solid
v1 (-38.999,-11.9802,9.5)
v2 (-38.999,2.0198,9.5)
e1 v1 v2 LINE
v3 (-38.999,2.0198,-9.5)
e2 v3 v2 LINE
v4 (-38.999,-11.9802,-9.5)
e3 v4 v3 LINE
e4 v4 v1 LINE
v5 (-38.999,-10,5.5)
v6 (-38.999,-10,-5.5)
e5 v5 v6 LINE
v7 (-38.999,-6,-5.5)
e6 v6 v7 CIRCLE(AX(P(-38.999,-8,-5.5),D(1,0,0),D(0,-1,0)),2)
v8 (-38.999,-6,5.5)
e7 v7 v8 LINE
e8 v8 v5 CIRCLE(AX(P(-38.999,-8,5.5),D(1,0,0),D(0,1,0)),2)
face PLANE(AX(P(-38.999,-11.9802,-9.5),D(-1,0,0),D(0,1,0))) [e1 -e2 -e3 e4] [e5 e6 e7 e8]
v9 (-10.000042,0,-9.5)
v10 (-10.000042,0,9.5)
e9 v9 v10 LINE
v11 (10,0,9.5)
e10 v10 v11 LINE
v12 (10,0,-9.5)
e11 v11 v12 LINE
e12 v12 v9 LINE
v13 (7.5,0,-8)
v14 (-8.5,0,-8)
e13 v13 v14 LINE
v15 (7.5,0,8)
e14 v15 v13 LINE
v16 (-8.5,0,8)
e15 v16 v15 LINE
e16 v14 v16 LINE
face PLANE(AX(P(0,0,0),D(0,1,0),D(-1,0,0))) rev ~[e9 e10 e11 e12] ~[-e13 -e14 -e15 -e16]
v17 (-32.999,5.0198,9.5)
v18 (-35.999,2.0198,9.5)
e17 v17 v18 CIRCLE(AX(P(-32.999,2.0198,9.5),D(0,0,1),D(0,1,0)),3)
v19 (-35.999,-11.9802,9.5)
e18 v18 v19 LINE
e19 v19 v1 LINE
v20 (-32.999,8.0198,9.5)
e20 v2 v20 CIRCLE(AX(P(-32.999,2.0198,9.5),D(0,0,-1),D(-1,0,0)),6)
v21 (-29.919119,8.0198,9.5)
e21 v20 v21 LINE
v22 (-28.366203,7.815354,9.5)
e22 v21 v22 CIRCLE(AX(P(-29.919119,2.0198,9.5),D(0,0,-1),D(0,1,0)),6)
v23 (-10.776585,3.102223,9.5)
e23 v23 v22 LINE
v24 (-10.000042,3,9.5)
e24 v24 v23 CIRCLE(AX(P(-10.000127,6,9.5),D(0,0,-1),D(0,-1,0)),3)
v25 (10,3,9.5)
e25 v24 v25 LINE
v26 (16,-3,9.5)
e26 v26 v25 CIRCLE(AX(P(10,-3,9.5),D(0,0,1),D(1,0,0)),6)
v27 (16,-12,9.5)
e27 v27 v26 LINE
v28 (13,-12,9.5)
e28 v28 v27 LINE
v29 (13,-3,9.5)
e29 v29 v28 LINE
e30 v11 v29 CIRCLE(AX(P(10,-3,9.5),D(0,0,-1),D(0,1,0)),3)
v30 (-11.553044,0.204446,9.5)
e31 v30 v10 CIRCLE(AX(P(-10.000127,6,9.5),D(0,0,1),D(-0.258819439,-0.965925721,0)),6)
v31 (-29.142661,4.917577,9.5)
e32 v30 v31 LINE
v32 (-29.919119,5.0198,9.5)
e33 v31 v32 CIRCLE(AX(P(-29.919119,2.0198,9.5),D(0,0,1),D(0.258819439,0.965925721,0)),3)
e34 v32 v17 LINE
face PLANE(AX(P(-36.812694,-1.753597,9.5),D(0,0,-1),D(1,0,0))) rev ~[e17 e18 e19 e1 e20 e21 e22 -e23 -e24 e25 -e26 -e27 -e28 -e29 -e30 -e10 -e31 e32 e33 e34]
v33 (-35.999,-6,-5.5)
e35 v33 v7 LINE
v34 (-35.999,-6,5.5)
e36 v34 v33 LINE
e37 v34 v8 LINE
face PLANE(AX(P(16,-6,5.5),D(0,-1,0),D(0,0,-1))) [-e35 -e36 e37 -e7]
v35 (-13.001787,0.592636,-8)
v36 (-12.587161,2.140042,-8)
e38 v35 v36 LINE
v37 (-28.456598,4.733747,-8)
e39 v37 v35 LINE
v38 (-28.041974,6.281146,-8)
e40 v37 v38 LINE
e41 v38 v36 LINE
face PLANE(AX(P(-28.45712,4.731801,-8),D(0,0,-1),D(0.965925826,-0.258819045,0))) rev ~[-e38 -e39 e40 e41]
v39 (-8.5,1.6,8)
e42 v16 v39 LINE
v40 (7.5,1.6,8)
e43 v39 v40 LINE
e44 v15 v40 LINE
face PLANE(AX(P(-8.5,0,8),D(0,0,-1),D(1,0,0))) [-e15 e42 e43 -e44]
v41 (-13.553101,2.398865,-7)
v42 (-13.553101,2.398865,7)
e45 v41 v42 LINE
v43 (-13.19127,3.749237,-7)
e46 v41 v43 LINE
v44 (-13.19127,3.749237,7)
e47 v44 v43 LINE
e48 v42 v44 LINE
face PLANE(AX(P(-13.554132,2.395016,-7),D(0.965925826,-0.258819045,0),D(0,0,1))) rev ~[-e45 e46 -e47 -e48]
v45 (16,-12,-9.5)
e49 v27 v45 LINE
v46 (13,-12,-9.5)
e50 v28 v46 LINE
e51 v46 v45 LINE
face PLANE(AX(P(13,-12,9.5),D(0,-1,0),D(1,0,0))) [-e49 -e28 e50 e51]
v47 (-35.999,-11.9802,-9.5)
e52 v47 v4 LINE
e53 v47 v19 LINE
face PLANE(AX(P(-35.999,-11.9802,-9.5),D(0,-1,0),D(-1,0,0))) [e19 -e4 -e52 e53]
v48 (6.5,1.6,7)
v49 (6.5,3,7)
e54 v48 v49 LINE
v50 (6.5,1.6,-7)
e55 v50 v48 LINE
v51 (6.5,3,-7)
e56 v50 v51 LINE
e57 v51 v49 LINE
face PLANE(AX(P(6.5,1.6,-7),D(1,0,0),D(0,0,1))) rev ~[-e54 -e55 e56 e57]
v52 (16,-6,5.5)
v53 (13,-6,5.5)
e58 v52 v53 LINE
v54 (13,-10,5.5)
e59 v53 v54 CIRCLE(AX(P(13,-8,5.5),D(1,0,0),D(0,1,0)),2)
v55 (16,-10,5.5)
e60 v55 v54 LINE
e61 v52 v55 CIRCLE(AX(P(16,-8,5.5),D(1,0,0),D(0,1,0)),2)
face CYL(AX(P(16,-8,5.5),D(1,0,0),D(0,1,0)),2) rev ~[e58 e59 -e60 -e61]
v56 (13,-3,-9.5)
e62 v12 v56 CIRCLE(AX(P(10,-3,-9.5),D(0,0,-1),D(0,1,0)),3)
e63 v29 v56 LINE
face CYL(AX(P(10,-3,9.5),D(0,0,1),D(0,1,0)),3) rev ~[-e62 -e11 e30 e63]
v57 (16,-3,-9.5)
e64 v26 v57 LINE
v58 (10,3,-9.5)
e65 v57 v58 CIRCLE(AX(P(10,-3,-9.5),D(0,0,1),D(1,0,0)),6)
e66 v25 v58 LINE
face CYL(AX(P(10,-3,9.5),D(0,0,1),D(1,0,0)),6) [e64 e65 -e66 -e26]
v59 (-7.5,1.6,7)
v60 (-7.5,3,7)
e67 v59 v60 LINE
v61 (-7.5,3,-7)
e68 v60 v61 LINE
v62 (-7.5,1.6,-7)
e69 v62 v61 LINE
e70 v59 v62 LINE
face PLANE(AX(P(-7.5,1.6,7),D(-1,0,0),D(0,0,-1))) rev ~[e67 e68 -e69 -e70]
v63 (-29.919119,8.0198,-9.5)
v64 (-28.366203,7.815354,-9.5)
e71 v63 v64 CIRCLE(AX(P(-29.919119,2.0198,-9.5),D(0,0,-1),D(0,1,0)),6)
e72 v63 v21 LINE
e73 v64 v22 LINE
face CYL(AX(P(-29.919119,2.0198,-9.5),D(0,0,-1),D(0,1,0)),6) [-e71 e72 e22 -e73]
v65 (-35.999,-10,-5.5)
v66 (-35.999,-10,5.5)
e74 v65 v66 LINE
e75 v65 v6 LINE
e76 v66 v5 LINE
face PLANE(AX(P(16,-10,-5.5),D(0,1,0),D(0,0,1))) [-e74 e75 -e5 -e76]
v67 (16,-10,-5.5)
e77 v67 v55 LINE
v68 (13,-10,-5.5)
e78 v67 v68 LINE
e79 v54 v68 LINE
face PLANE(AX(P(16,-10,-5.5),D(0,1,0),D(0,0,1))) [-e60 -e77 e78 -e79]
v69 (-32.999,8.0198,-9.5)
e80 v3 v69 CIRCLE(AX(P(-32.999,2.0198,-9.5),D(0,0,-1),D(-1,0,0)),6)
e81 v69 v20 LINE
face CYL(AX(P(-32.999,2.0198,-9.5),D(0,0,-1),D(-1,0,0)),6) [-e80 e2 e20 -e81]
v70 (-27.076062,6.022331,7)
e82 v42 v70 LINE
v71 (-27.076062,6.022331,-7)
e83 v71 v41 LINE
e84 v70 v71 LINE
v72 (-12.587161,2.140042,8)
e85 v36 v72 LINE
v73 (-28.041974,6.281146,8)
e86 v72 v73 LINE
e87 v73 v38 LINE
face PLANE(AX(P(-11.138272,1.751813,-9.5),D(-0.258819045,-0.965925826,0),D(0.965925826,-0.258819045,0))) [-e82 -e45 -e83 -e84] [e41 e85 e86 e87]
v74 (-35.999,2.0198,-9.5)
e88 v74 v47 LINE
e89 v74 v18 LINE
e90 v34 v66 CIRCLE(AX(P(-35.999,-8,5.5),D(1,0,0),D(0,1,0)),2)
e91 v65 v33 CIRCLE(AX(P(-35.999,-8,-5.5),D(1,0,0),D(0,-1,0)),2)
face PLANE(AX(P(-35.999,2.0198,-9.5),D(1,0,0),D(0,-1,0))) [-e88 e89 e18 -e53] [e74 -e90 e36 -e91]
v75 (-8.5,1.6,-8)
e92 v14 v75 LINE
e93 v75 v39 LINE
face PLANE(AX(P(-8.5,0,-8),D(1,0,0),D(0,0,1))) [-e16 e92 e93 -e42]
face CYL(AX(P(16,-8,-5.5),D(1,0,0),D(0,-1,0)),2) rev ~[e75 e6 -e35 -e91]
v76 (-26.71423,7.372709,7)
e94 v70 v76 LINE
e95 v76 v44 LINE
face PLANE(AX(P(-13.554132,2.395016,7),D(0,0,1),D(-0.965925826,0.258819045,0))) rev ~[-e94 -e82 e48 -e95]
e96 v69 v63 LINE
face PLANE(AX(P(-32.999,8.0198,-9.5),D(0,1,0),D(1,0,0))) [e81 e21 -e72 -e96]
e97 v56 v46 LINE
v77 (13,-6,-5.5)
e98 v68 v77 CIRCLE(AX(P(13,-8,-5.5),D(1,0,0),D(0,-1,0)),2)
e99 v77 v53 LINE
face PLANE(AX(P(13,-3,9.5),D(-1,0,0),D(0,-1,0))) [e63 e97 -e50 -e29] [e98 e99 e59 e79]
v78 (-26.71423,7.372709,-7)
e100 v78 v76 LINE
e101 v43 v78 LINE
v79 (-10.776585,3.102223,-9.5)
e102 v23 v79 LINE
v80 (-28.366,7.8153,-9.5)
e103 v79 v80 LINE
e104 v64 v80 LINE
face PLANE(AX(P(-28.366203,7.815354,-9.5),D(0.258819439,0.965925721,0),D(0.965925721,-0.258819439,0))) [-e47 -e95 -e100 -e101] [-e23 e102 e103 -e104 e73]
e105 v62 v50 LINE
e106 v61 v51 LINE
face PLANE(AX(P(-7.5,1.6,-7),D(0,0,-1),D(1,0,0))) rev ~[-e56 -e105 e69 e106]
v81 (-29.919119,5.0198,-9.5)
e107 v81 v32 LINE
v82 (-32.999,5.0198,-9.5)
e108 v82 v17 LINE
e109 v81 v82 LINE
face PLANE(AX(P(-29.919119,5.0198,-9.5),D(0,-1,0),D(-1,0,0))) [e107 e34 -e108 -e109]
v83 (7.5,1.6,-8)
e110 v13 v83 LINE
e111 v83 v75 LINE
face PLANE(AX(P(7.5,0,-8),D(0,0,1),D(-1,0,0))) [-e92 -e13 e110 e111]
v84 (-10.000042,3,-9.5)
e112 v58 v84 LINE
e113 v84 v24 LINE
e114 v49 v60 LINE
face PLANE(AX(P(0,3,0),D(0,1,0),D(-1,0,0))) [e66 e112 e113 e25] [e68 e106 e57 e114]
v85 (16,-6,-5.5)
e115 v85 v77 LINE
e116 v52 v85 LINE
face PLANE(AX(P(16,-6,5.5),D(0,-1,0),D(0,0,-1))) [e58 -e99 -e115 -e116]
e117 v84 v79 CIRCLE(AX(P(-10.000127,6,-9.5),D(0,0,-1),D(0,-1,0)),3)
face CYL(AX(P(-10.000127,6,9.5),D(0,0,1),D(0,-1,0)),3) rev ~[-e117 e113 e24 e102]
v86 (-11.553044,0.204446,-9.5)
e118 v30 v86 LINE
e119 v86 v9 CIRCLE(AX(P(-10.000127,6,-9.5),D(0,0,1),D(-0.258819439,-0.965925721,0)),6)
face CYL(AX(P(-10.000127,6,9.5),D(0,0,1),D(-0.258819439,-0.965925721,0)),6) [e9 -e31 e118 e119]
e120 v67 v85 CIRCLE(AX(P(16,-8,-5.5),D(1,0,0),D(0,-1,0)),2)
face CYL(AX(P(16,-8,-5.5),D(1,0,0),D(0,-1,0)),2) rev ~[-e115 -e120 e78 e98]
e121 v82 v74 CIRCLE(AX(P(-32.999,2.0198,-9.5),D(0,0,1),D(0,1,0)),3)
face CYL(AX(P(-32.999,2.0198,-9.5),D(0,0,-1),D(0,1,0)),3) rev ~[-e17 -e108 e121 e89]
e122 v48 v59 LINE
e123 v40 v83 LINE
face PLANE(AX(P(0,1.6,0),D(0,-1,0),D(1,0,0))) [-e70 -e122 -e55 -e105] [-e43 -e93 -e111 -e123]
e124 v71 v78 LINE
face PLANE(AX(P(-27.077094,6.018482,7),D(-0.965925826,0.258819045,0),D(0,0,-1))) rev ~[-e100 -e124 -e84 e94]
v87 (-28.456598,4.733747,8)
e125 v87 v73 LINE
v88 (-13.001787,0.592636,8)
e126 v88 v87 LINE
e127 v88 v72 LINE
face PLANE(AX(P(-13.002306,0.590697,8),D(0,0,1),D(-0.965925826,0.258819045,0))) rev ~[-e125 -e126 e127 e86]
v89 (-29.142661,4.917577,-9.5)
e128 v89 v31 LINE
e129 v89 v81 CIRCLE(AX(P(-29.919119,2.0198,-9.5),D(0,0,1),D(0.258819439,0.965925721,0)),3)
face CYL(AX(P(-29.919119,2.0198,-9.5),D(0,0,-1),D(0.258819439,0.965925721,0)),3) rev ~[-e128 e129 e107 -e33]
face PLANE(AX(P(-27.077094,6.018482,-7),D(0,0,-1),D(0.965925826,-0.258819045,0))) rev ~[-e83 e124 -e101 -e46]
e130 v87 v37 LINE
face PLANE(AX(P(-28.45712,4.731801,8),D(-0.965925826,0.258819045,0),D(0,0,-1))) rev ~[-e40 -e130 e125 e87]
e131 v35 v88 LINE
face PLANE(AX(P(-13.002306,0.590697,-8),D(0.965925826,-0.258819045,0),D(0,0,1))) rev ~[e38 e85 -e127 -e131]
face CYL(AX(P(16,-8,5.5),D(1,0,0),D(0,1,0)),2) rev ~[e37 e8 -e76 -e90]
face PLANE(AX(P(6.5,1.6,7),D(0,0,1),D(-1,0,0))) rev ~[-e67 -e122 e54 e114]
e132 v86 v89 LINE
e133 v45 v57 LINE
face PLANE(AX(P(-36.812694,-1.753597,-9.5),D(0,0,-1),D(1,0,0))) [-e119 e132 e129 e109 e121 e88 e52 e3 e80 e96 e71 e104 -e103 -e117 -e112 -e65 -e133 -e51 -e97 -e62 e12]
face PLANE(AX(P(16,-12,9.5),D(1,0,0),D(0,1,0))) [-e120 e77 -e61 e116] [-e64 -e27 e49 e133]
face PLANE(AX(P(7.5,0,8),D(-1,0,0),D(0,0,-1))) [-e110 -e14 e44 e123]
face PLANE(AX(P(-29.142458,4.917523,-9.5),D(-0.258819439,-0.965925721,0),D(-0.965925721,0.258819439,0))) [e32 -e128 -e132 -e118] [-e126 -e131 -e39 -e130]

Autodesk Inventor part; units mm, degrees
ref_plane "YZ Plane" through (0, 0, 0) normal (1, 0, 0) x (0, 1, 0)
ref_plane "XZ Plane" through (0, 0, 0) normal (0, 1, 0) x (-1, 0, 0)
ref_plane "XY Plane" through (0, 0, 0) normal (0, 0, 1) x (1, 0, 0)
sketch "スケッチ1" plane through (0, 0, 0) normal (0, 1, 0) x (-1, 0, 0)
  line L0 (-10, -9.5) -> (10, -9.5)
  line L1 (10, -9.5) -> (10, 9.5)
  line L2 (10, 9.5) -> (-10, 9.5)
  line L3 (-10, 9.5) -> (-10, -9.5)
  line L4 (-10, -9.5) -> (10, 9.5) construction
  line L5 (10, -9.5) -> (-10, 9.5) construction
  point P0 (0, 0)
  dimension "d0" = 20
  dimension "d1" = 19
extrude "プレート1" add sketch "スケッチ1" along normal blind 3
sketch "スケッチ5" plane through (0, 3, 0) normal (0, 1, 0) x (1, 0, 0)
  point P0 (0, 0)
sketch "スケッチ6" plane through (-10.7765, 3.1022, 9.5) normal (-0.258819, -0.9659258, 0) x (0.9659258, -0.258819, 0)
  line L0 (0, -19) -> (0, 0)
  line L1 (0, 0) -> (-18.2101, 0)
  line L2 (-18.2101, 0) -> (-18.2101, -19)
  line L3 (-18.2101, -19) -> (0, -19)
edge flange "フランジ3" height 19 angle 15 thickness 3 bend radius 3 thickness toward (-0.258819, -0.9659258, 0) relief tear relief width 3 relief depth 1.5 edges at (-10, 3, 0) wall of the first edge with corners at (-10.7765, 3.1022, -9.5) (-10.7765, 3.1022, 9.5) (-28.366, 7.8153, 9.5) (-28.366, 7.8153, -9.5)
bend "曲げ3"
corner "コーナー3"
sketch "スケッチ7" plane through (-29.919, 5.0198, 9.5) normal (0, 1, 0) x (1, 0, 0)
  line L0 (0, -19) -> (0, 0)
  line L1 (0, 0) -> (-3.0801, 0)
  line L2 (-3.0801, 0) -> (-3.0801, -19)
  line L3 (-3.0801, -19) -> (0, -19)
edge flange "フランジ4" height 3.87 angle -15 thickness 3 bend radius 3 thickness toward (0, 1, 0) relief tear relief width 3 relief depth 1.5 edges at (-28.366, 7.8153, 0) wall of the first edge with corners at (-29.919, 5.0198, -9.5) (-29.919, 5.0198, 9.5) (-32.999, 5.0198, 9.5) (-32.999, 5.0198, -9.5)
bend "曲げ4"
corner "コーナー4"
sketch "スケッチ8" plane through (13, -3, -9.5) normal (1, 0, 0) x (0, -1, 0)
  line L0 (0, 19) -> (0, 0)
  line L1 (0, 0) -> (9, 0)
  line L2 (9, 0) -> (9, 19)
  line L3 (9, 19) -> (0, 19)
edge flange "フランジ5" height 15 angle -90 thickness 3 bend radius 3 thickness toward (1, 0, 0) relief tear relief width 3 relief depth 1.5 edges at (10, 3, 0) wall of the first edge with corners at (13, -3, 9.5) (13, -3, -9.5) (13, -12, -9.5) (13, -12, 9.5)
bend "曲げ5"
corner "コーナー5"
sketch "スケッチ9" plane through (-35.999, 2.0198, 9.5) normal (-1, 0, 0) x (0, 1, 0)
  line L0 (0, -19) -> (0, 0)
  line L1 (0, 0) -> (-14, 0)
  line L2 (-14, 0) -> (-14, -19)
  line L3 (-14, -19) -> (0, -19)
edge flange "フランジ6" height 20 angle -90 thickness 3 bend radius 3 thickness toward (-1, 0, 0) relief tear relief width 3 relief depth 1.5 edges at (-32.999, 8.0198, 0) wall of the first edge with corners at (-35.999, 2.0198, -9.5) (-35.999, 2.0198, 9.5) (-35.999, -11.9802, 9.5) (-35.999, -11.9802, -9.5)
bend "曲げ6"
corner "コーナー6"
sketch "スケッチ14" plane through (16, -12, 9.5) normal (1, 0, 0) x (0, 0, -1)
  line L0 (4, 6) -> (15, 6)
  arc A0 (15, 2) -> (15, 6) centre (15, 4) ccw
  line L1 (15, 2) -> (4, 2)
  arc A1 (4, 6) -> (4, 2) centre (4, 4) ccw
  line L2 (19, 9) -> (19, 0) projected
  line L3 (0, 9) -> (0, 0) projected
  line L4 (0, 0) -> (19, 0) projected
  point P0 (9.5, 12)
  dimension "d86" = 2
  dimension "d87" = 4
  dimension "d88" = 4
  dimension "d89" = 4
extrude "押し出し6" cut sketch "スケッチ14" against normal blind 100
sketch "スケッチ15" plane through (0, 0, 0) normal (0, -1, 0) x (1, 0, 0)
  line L0 (7.5, -8) -> (-8.5, -8)
  line L1 (-8.5, -8) -> (-8.5, 8)
  line L2 (-8.5, 8) -> (7.5, 8)
  line L3 (7.5, 8) -> (7.5, -8)
  line L4 (7.5, -8) -> (-8.5, 8) construction
  line L5 (-8.5, -8) -> (7.5, 8) construction
  line L6 (-10, -9.5) -> (-10, 9.5) projected
  point P0 (0, 0)
  point P1 (-0.5, 0)
  point P2 (-0.5, 0)
  dimension "d92" = 16
  dimension "d93" = 16
  dimension "d94" = 9.5
extrude "押し出し7" cut sketch "スケッチ15" against normal blind 1.6
sketch "スケッチ16" plane through (0, 1.6, 0) normal (0, -1, 0) x (1, 0, 0)
  line L0 (-7.5, -7) -> (6.5, -7)
  line L1 (6.5, -7) -> (6.5, 7)
  line L2 (6.5, 7) -> (-7.5, 7)
  line L3 (-7.5, 7) -> (-7.5, -7)
  line L4 (-7.5, -7) -> (6.5, 7) construction
  line L5 (6.5, -7) -> (-7.5, 7) construction
  line L6 (7.5, -8) -> (-8.5, -8) projected
  line L7 (7.5, 8) -> (7.5, -8) projected
  point P0 (0, 0)
  point P1 (-0.5, 0)
  point P2 (-0.5, 0)
  point P3 (-0.5, -8)
  point P4 (7.5, 0)
  dimension "d97" = 14
  dimension "d98" = 14
extrude "押し出し8" cut sketch "スケッチ16" against normal blind 1.4
sketch "スケッチ17" plane through (-11.5529, 0.2044, -9.5) normal (-0.258819, -0.9659258, 0) x (0.9659258, -0.258819, 0)
  line L0 (-17.5, 1.5) -> (-1.5, 1.5)
  line L1 (-1.5, 1.5) -> (-1.5, 17.5)
  line L2 (-1.5, 17.5) -> (-17.5, 17.5)
  line L3 (-17.5, 17.5) -> (-17.5, 1.5)
  line L4 (-17.5, 1.5) -> (-1.5, 17.5) construction
  line L5 (-1.5, 1.5) -> (-17.5, 17.5) construction
  line L6 (0, 0) -> (0, 19) projected
  point P0 (11.2122, 9.5)
  point P1 (-9.5, 9.5)
  point P2 (-9.5, 9.5)
  point P3 (0, 9.5)
  dimension "d101" = 16
  dimension "d102" = 16
  dimension "d103" = 9.5
extrude "押し出し9" cut sketch "スケッチ17" against normal blind 1.6
sketch "スケッチ18" plane through (-11.1388, 1.7499, -9.5) normal (-0.258819, -0.9659258, 0) x (0.9659258, -0.258819, 0)
  line L0 (-16.5, 2.5) -> (-2.5, 2.5)
  line L1 (-2.5, 2.5) -> (-2.5, 16.5)
  line L2 (-2.5, 16.5) -> (-16.5, 16.5)
  line L3 (-16.5, 16.5) -> (-16.5, 2.5)
  line L4 (-16.5, 2.5) -> (-2.5, 16.5) construction
  line L5 (-2.5, 2.5) -> (-16.5, 16.5) construction
  line L6 (-1.5, 17.5) -> (-1.5, 1.5) projected
  line L7 (-18.2101, 0) -> (0, 0) projected
  line L8 (-1.5, 1.5) -> (-17.5, 1.5) projected
  point P0 (11.2122, 9.5)
  point P1 (-9.5, 9.5)
  point P2 (-9.5, 9.5)
  point P3 (-1.5, 9.5)
  point P4 (-9.5, 9.5)
  point P5 (-9.5, 16.5)
  point P6 (-9.105, 0)
  point P7 (-9.5, 1.5)
  dimension "d106" = 14
  dimension "d107" = 14
extrude "押し出し10" cut sketch "スケッチ18" against normal blind 1.4
equation "\"d2\" = Thickness"
equation "\"d29\" = BendReliefWidth"
equation "\"d30\" = BendReliefDepth"
equation "\"d31\" = MinimumRemnant"
equation "\"d32\" = TransitionRadius"
equation "\"d35\" = BendRadius"
equation "\"d36\" = CornerReliefSize"
equation "\"d37\" = GapSize"
equation "\"d38\" = JacobiRadiusSize"
equation "\"d39\" = BendReliefWidth"
equation "\"d40\" = BendReliefDepth"
equation "\"d41\" = MinimumRemnant"
equation "\"d42\" = TransitionRadius"
equation "\"d45\" = BendRadius"
equation "\"d46\" = CornerReliefSize"
equation "\"d47\" = GapSize"
equation "\"d48\" = JacobiRadiusSize"
equation "\"d49\" = BendReliefWidth"
equation "\"d50\" = BendReliefDepth"
equation "\"d51\" = MinimumRemnant"
equation "\"d52\" = TransitionRadius"
equation "\"d55\" = BendRadius"
equation "\"d56\" = CornerReliefSize"
equation "\"d57\" = GapSize"
equation "\"d58\" = JacobiRadiusSize"
equation "\"d59\" = BendReliefWidth"
equation "\"d60\" = BendReliefDepth"
equation "\"d61\" = MinimumRemnant"
equation "\"d62\" = TransitionRadius"
equation "\"d65\" = BendRadius"
equation "\"d66\" = CornerReliefSize"
equation "\"d67\" = GapSize"
equation "\"d68\" = JacobiRadiusSize"
equation "\"BendRadius\" = Thickness"
equation "\"BendReliefWidth\" = Thickness"
equation "\"BendReliefDepth\" = 0.5 * Thickness"
equation "\"CornerReliefSize\" = 4 * Thickness"
equation "\"MinimumRemnant\" = 2 * Thickness"
equation "\"TransitionRadius\" = BendRadius"
equation "\"JacobiRadiusSize\" = BendRadius"
equation "\"GapSize\" = Thickness"
equation "\"Thickness\" = 3"
properties part number "thumbkey_plate" material "アルミニウム 6061"
